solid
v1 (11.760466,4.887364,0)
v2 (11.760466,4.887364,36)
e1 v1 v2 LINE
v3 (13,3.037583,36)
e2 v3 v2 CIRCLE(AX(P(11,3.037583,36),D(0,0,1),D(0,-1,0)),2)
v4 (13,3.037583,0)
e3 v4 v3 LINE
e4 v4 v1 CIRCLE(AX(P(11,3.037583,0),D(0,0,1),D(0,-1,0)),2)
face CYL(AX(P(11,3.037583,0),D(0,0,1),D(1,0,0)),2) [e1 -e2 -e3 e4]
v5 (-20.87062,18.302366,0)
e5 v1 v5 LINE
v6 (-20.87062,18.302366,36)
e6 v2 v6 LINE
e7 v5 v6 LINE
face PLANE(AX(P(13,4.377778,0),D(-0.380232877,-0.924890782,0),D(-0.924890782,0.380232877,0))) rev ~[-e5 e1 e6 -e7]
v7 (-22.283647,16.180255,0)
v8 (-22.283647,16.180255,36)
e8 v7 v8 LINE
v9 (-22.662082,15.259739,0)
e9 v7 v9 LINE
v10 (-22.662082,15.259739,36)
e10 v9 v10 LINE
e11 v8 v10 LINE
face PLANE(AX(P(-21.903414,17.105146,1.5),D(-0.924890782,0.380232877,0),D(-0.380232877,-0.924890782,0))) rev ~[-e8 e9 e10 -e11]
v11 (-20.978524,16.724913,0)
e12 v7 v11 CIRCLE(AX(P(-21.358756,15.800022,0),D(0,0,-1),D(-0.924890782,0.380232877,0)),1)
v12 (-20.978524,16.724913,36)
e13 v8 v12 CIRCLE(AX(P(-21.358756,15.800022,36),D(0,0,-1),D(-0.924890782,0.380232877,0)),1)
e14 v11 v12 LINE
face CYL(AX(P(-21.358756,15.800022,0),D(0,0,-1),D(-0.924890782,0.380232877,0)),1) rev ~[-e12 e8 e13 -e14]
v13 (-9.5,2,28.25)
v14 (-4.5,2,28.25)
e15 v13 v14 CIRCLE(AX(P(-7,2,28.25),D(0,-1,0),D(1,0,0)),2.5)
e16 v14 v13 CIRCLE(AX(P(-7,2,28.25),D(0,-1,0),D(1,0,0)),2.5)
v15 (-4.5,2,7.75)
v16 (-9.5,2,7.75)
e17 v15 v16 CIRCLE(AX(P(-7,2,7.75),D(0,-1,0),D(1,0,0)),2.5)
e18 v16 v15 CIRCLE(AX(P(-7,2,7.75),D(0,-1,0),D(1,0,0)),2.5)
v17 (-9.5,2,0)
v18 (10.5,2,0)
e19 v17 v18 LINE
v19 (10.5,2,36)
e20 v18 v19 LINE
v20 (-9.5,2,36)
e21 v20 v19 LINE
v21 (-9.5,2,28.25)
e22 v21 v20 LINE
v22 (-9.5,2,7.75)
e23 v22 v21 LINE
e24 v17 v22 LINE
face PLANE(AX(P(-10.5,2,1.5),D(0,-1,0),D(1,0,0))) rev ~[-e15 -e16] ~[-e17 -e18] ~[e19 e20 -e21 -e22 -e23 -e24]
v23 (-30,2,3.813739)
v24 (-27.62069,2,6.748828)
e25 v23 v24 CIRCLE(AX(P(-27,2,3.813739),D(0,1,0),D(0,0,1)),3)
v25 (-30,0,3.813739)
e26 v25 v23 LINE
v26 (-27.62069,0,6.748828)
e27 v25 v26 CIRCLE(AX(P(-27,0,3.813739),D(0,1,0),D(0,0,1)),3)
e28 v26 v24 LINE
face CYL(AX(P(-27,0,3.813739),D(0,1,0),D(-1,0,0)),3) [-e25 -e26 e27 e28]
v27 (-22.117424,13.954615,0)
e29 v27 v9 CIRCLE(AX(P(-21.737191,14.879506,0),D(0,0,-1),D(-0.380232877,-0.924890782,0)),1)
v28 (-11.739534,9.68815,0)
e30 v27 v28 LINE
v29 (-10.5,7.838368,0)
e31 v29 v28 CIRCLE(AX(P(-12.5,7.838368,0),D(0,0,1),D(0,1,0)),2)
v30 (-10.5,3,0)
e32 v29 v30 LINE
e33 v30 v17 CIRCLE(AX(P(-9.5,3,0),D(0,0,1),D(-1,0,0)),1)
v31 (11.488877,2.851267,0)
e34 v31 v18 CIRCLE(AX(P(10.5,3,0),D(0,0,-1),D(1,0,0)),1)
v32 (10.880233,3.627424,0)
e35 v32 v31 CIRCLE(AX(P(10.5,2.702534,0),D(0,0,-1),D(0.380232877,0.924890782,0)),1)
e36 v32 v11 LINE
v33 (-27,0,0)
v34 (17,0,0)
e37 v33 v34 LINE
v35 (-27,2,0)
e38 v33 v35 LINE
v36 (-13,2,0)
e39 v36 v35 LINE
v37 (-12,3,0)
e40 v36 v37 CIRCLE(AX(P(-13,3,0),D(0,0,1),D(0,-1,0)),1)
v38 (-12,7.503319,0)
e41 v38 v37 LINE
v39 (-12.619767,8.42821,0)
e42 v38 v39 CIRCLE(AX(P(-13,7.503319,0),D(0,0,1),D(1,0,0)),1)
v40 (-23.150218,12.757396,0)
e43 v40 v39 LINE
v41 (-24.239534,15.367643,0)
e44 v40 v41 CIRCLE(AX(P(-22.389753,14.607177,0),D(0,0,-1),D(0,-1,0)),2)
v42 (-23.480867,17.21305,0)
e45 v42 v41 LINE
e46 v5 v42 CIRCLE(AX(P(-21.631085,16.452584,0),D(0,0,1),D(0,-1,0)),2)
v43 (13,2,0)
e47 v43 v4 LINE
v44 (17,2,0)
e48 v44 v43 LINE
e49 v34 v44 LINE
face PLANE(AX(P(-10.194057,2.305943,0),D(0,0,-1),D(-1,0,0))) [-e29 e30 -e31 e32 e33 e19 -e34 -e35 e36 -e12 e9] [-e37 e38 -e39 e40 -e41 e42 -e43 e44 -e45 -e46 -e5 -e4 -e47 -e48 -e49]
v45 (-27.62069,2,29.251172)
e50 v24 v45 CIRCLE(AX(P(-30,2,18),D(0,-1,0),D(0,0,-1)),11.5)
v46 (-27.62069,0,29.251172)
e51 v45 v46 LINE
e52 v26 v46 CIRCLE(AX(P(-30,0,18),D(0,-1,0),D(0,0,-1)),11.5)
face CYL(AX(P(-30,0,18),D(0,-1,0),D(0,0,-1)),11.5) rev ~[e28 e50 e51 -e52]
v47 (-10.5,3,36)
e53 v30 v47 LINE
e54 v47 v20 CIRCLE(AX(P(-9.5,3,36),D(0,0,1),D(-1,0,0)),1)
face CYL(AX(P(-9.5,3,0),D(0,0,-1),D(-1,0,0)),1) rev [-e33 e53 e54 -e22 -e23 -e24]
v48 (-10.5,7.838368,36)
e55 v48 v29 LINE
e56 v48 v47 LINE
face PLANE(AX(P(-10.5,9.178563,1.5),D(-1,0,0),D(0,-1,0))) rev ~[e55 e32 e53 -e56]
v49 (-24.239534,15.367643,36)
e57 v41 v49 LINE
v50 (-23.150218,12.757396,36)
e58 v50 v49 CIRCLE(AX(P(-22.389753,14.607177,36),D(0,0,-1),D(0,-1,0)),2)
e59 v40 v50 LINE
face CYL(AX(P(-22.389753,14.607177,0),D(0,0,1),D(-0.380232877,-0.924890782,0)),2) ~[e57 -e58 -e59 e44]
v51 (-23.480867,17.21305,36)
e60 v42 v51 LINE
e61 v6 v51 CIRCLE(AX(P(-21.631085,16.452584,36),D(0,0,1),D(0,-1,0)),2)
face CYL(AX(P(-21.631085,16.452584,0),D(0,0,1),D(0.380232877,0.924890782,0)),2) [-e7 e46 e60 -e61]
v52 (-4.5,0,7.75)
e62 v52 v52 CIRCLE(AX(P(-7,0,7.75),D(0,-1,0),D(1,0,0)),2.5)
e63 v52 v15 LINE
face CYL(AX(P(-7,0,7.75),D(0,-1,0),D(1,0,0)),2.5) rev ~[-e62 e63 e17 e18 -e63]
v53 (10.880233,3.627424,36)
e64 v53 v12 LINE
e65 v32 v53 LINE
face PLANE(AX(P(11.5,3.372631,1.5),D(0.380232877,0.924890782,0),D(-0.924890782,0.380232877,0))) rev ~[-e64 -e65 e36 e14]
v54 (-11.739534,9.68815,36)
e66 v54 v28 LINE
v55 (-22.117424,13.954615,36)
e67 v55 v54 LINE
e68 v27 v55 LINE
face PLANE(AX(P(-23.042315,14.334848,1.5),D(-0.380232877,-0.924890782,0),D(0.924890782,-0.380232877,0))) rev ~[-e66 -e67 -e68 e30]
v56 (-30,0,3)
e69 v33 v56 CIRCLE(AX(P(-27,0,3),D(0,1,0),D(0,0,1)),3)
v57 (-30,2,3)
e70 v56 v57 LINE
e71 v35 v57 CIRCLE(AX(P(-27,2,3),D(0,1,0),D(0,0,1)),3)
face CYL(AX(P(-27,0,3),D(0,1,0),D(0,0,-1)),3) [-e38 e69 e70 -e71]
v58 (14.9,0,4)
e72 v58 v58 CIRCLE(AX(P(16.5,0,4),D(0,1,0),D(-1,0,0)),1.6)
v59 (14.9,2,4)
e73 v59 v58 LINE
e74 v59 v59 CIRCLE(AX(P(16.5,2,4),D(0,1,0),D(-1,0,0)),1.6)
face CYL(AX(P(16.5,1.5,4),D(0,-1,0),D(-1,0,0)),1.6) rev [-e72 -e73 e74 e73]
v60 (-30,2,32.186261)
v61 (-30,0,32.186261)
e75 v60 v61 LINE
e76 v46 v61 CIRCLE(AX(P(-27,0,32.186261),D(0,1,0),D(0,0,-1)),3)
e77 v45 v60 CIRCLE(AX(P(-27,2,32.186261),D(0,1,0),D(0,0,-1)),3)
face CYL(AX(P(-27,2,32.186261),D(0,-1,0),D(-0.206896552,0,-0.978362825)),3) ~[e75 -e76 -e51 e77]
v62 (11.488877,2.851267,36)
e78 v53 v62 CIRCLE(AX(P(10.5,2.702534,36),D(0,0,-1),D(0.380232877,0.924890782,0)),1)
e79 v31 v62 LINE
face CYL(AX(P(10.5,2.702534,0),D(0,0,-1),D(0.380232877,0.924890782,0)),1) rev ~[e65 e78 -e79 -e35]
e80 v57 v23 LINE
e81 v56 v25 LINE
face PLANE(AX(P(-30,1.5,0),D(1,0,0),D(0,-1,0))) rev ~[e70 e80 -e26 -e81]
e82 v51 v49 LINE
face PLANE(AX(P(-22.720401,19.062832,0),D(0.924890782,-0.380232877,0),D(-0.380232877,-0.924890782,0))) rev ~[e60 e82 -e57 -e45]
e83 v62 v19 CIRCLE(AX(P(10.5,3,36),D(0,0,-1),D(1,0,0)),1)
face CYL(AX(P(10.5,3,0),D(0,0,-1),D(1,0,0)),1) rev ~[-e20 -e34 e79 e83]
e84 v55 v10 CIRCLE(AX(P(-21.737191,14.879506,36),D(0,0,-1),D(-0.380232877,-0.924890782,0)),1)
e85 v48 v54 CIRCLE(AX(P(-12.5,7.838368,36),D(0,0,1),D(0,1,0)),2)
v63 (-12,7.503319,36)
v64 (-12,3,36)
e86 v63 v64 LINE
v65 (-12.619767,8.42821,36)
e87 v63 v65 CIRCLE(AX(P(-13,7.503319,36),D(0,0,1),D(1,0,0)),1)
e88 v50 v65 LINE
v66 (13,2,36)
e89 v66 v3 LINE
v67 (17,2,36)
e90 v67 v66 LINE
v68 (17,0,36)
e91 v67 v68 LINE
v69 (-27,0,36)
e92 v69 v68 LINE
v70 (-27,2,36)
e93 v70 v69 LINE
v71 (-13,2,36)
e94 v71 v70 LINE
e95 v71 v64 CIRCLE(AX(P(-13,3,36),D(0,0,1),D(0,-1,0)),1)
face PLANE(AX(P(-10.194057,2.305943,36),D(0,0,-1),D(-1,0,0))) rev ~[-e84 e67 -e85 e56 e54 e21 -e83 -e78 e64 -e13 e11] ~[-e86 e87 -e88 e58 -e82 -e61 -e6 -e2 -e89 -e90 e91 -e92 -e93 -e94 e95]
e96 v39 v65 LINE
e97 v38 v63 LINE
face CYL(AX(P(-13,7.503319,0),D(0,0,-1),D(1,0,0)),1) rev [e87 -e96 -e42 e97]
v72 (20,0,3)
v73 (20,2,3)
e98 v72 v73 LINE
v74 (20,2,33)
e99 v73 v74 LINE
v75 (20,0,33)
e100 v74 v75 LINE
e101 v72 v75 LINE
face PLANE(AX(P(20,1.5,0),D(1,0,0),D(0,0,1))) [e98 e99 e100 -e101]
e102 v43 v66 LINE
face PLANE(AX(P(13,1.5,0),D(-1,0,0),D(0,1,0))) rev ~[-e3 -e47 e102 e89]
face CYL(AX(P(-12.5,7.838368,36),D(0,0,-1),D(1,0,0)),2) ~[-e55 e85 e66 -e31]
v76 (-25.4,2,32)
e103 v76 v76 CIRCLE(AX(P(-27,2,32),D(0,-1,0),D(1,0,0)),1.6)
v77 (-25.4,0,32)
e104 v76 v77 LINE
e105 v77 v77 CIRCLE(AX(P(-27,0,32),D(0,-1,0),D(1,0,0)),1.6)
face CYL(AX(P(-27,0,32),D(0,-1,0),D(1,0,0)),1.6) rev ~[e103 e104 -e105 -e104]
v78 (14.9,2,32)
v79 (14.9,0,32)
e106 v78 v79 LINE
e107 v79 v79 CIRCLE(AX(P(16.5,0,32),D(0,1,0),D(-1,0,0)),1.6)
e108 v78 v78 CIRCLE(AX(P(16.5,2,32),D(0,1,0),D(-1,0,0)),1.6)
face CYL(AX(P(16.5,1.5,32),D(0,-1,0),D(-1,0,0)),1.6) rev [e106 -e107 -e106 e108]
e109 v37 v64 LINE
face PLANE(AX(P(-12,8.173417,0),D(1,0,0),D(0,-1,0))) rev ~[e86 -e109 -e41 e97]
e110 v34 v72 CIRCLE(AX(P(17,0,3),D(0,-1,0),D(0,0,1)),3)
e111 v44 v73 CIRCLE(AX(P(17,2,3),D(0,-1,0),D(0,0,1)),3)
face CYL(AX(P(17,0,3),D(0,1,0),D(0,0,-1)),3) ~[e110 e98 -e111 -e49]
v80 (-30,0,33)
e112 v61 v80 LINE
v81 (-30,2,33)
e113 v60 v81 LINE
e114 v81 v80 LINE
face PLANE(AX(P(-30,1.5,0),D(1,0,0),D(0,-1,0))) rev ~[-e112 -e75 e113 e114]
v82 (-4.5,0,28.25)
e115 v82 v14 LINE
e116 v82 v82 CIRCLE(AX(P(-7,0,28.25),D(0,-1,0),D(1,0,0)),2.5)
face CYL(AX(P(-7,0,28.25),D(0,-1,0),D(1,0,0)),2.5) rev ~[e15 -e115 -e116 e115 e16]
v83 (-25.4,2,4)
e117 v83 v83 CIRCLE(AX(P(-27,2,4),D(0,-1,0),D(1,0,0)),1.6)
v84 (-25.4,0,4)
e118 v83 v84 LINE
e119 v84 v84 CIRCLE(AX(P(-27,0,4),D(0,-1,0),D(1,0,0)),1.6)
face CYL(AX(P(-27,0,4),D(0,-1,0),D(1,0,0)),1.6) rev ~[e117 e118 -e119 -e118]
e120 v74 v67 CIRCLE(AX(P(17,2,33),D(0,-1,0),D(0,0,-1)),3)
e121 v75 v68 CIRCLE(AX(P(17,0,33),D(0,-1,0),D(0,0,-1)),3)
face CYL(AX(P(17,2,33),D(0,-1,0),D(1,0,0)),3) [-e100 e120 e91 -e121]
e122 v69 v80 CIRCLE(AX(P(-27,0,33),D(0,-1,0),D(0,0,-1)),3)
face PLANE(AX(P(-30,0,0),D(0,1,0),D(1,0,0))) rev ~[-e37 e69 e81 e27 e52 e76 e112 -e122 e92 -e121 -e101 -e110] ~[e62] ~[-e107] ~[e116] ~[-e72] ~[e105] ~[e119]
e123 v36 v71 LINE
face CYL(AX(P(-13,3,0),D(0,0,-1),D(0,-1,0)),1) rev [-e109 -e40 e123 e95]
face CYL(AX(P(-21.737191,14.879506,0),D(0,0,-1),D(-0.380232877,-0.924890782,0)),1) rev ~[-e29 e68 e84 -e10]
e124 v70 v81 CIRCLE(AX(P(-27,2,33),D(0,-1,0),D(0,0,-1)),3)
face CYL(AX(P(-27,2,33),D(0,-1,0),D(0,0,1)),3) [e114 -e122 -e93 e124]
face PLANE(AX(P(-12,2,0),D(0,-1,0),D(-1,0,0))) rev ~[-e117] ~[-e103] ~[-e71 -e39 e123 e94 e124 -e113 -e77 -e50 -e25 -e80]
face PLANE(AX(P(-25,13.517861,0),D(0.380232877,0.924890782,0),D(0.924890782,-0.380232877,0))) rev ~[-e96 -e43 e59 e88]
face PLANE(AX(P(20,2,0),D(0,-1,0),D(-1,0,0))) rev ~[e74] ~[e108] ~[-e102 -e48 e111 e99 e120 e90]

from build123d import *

# Parameters (mm, degrees)
F1_DEPTH     = 36
F2_T         = -1.5
F3_R         = 1.6
F4_DEPTH     = 1.5
F5_R         = 1.6
F6_DEPTH     = 5
F7_DEPTH     = 0.5
F8_DEPTH     = 0.5
F9_R         = 3
F10_T1_DEPTH = 36
F11_R        = 2
F5_R_2       = 2.5
F12_DEPTH    = 5


# Not quite as in the source:
# - a fillet or chamfer that OpenCascade refuses, or shapes differently, is made with other operations: its cross-section is extruded or revolved along the edge and cut away or added


with BuildPart() as f1:
    # F0 (on Top) → F1 (new body)
    with BuildSketch(Plane.XY):
        Polygon((-12, 0), (20, 0), (20, 1.5), (13, 1.5), (13, 4.3777777778), (-22.720401141, 19.0628315802), (-25, 13.5178613825), (-12, 8.1734169381), (-12, 1.5), (-30, 1.5), (-30, 0), align=None)
    extrude(amount=F1_DEPTH)

    # F2: a shell. OpenCascade refuses it in one call, so the cavity is built on its own and cut out:
    # the body offset inwards by the wall thickness, plus a prism from it out through each open face.
    f2_core = offset(f1.part, amount=F2_T, kind=Kind.INTERSECTION, mode=Mode.PRIVATE)
    f2_exits = [f2_core.faces().sort_by_distance(p)[0] for p in [
        (-5.203768, 6.959906, 34.5),
        (-5.203768, 6.959906, 1.5),
    ]]
    add(f2_core, mode=Mode.SUBTRACT)
    extrude(f2_exits, amount=-F2_T, mode=Mode.SUBTRACT)

    # F3 (on face) → F4 (cut)
    with BuildSketch(Plane(origin=(0, 1.5, 0), x_dir=(-1, 0, 0), z_dir=(0, 1, 0))):
        with Locations((-16.5, 32)):
            Circle(F3_R)
        with Locations((-16.5, 4)):
            Circle(F3_R)
    extrude(amount=-F4_DEPTH, mode=Mode.SUBTRACT)

    # F5 (on face) → F6 (cut)
    with BuildSketch(Plane.XZ):
        with Locations((-27, 32)):
            Circle(F5_R)
        with BuildLine():
            Line((-30, 29.5), (-30, 6.5))
            ThreePointArc((-30, 6.5), (-18.5, 18), (-30, 29.5))
        make_face()
        with Locations((-27, 4)):
            Circle(F5_R)
    extrude(amount=-F6_DEPTH, mode=Mode.SUBTRACT)

    # F7 (add): faces of the model
    f7_faces = [f1.faces().sort_by_distance(p)[0] for p in [
        (16.5, 1.5, 18),
        (-21, 1.5, 0.4024922359),
    ]]
    extrude(f7_faces, amount=F7_DEPTH)

    # F8 (add): a face of the model
    f8_faces = [f1.faces().sort_by_distance(p)[0] for p in [
        (0.5, 1.5, 18),
    ]]
    extrude(f8_faces, amount=F8_DEPTH)

    # F9
    f9_edges = [f1.edges().sort_by_distance(p)[0] for p in [
        (20, 1, 36),
        (20, 1, 0),
        (-30, 1, 0),
        (-30, 1, 36),
        (-30, 1, 6.5),
        (-30, 1, 29.5),
    ]]
    fillet(f9_edges, radius=F9_R)

    # F10: fillet of radius 1 on 8 edges, made by hand

    # F10_s2 → F10_t1 (join)
    with BuildSketch(Plane.XY):
        with BuildLine():
            ThreePointArc((-10.5, 3), (-10.2071067812, 2.2928932188), (-9.5, 2))
            Line((-9.5, 2), (-10.5, 2))
            Line((-10.5, 2), (-10.5, 3))
        make_face()
        with BuildLine():
            ThreePointArc((-22.1174237286, 13.954615363), (-22.6600526413, 14.4943748472), (-22.6620816337, 15.2597390224))
            Line((-22.6620816337, 15.2597390224), (-23.0423145109, 14.3348482402))
            Line((-23.0423145109, 14.3348482402), (-22.1174237286, 13.954615363))
        make_face()
        with BuildLine():
            ThreePointArc((-22.2836471604, 16.1802553088), (-21.7438876763, 16.7228842215), (-20.978523501, 16.7249132139))
            Line((-20.978523501, 16.7249132139), (-21.9034142833, 17.105146091))
            Line((-21.9034142833, 17.105146091), (-22.2836471604, 16.1802553088))
        make_face()
        with BuildLine():
            ThreePointArc((10.8802328772, 3.6274244806), (11.3307324711, 3.2592055599), (11.5, 2.7025336984))
            Line((11.5, 2.7025336984), (11.5, 3.3726313301))
            Line((11.5, 3.3726313301), (10.8802328772, 3.6274244806))
        make_face()
        with BuildLine():
            ThreePointArc((-13, 2), (-12.2928932188, 2.2928932188), (-12, 3))
            Line((-12, 3), (-12, 2))
            Line((-12, 2), (-13, 2))
        make_face()
        with BuildLine():
            ThreePointArc((-12, 7.5033193063), (-12.1692675289, 8.0599911678), (-12.6197671228, 8.4282100886))
            Line((-12.6197671228, 8.4282100886), (-12, 8.1734169381))
            Line((-12, 8.1734169381), (-12, 7.5033193063))
        make_face()
        with BuildLine():
            ThreePointArc((11.5, 3), (11.2071067812, 2.2928932188), (10.5, 2))
            Line((10.5, 2), (11.5, 2))
            Line((11.5, 2), (11.5, 3))
        make_face()
    extrude(amount=F10_T1_DEPTH)

    # F11
    f11_edges = [f1.edges().sort_by_distance(p)[0] for p in [
        (-25, 13.517861, 18),
        (-22.720401, 19.062832, 18),
        (13, 4.377778, 18),
        (-10.5, 9.178563, 18),
    ]]
    fillet(f11_edges, radius=F11_R)

    # F5 (on face) → F12 (cut)
    with BuildSketch(Plane.XZ):
        with Locations((-7, 28.25)):
            Circle(F5_R_2)
        with Locations((-7, 7.75)):
            Circle(F5_R_2)
    extrude(amount=-F12_DEPTH, mode=Mode.SUBTRACT)


solid = f1.part
